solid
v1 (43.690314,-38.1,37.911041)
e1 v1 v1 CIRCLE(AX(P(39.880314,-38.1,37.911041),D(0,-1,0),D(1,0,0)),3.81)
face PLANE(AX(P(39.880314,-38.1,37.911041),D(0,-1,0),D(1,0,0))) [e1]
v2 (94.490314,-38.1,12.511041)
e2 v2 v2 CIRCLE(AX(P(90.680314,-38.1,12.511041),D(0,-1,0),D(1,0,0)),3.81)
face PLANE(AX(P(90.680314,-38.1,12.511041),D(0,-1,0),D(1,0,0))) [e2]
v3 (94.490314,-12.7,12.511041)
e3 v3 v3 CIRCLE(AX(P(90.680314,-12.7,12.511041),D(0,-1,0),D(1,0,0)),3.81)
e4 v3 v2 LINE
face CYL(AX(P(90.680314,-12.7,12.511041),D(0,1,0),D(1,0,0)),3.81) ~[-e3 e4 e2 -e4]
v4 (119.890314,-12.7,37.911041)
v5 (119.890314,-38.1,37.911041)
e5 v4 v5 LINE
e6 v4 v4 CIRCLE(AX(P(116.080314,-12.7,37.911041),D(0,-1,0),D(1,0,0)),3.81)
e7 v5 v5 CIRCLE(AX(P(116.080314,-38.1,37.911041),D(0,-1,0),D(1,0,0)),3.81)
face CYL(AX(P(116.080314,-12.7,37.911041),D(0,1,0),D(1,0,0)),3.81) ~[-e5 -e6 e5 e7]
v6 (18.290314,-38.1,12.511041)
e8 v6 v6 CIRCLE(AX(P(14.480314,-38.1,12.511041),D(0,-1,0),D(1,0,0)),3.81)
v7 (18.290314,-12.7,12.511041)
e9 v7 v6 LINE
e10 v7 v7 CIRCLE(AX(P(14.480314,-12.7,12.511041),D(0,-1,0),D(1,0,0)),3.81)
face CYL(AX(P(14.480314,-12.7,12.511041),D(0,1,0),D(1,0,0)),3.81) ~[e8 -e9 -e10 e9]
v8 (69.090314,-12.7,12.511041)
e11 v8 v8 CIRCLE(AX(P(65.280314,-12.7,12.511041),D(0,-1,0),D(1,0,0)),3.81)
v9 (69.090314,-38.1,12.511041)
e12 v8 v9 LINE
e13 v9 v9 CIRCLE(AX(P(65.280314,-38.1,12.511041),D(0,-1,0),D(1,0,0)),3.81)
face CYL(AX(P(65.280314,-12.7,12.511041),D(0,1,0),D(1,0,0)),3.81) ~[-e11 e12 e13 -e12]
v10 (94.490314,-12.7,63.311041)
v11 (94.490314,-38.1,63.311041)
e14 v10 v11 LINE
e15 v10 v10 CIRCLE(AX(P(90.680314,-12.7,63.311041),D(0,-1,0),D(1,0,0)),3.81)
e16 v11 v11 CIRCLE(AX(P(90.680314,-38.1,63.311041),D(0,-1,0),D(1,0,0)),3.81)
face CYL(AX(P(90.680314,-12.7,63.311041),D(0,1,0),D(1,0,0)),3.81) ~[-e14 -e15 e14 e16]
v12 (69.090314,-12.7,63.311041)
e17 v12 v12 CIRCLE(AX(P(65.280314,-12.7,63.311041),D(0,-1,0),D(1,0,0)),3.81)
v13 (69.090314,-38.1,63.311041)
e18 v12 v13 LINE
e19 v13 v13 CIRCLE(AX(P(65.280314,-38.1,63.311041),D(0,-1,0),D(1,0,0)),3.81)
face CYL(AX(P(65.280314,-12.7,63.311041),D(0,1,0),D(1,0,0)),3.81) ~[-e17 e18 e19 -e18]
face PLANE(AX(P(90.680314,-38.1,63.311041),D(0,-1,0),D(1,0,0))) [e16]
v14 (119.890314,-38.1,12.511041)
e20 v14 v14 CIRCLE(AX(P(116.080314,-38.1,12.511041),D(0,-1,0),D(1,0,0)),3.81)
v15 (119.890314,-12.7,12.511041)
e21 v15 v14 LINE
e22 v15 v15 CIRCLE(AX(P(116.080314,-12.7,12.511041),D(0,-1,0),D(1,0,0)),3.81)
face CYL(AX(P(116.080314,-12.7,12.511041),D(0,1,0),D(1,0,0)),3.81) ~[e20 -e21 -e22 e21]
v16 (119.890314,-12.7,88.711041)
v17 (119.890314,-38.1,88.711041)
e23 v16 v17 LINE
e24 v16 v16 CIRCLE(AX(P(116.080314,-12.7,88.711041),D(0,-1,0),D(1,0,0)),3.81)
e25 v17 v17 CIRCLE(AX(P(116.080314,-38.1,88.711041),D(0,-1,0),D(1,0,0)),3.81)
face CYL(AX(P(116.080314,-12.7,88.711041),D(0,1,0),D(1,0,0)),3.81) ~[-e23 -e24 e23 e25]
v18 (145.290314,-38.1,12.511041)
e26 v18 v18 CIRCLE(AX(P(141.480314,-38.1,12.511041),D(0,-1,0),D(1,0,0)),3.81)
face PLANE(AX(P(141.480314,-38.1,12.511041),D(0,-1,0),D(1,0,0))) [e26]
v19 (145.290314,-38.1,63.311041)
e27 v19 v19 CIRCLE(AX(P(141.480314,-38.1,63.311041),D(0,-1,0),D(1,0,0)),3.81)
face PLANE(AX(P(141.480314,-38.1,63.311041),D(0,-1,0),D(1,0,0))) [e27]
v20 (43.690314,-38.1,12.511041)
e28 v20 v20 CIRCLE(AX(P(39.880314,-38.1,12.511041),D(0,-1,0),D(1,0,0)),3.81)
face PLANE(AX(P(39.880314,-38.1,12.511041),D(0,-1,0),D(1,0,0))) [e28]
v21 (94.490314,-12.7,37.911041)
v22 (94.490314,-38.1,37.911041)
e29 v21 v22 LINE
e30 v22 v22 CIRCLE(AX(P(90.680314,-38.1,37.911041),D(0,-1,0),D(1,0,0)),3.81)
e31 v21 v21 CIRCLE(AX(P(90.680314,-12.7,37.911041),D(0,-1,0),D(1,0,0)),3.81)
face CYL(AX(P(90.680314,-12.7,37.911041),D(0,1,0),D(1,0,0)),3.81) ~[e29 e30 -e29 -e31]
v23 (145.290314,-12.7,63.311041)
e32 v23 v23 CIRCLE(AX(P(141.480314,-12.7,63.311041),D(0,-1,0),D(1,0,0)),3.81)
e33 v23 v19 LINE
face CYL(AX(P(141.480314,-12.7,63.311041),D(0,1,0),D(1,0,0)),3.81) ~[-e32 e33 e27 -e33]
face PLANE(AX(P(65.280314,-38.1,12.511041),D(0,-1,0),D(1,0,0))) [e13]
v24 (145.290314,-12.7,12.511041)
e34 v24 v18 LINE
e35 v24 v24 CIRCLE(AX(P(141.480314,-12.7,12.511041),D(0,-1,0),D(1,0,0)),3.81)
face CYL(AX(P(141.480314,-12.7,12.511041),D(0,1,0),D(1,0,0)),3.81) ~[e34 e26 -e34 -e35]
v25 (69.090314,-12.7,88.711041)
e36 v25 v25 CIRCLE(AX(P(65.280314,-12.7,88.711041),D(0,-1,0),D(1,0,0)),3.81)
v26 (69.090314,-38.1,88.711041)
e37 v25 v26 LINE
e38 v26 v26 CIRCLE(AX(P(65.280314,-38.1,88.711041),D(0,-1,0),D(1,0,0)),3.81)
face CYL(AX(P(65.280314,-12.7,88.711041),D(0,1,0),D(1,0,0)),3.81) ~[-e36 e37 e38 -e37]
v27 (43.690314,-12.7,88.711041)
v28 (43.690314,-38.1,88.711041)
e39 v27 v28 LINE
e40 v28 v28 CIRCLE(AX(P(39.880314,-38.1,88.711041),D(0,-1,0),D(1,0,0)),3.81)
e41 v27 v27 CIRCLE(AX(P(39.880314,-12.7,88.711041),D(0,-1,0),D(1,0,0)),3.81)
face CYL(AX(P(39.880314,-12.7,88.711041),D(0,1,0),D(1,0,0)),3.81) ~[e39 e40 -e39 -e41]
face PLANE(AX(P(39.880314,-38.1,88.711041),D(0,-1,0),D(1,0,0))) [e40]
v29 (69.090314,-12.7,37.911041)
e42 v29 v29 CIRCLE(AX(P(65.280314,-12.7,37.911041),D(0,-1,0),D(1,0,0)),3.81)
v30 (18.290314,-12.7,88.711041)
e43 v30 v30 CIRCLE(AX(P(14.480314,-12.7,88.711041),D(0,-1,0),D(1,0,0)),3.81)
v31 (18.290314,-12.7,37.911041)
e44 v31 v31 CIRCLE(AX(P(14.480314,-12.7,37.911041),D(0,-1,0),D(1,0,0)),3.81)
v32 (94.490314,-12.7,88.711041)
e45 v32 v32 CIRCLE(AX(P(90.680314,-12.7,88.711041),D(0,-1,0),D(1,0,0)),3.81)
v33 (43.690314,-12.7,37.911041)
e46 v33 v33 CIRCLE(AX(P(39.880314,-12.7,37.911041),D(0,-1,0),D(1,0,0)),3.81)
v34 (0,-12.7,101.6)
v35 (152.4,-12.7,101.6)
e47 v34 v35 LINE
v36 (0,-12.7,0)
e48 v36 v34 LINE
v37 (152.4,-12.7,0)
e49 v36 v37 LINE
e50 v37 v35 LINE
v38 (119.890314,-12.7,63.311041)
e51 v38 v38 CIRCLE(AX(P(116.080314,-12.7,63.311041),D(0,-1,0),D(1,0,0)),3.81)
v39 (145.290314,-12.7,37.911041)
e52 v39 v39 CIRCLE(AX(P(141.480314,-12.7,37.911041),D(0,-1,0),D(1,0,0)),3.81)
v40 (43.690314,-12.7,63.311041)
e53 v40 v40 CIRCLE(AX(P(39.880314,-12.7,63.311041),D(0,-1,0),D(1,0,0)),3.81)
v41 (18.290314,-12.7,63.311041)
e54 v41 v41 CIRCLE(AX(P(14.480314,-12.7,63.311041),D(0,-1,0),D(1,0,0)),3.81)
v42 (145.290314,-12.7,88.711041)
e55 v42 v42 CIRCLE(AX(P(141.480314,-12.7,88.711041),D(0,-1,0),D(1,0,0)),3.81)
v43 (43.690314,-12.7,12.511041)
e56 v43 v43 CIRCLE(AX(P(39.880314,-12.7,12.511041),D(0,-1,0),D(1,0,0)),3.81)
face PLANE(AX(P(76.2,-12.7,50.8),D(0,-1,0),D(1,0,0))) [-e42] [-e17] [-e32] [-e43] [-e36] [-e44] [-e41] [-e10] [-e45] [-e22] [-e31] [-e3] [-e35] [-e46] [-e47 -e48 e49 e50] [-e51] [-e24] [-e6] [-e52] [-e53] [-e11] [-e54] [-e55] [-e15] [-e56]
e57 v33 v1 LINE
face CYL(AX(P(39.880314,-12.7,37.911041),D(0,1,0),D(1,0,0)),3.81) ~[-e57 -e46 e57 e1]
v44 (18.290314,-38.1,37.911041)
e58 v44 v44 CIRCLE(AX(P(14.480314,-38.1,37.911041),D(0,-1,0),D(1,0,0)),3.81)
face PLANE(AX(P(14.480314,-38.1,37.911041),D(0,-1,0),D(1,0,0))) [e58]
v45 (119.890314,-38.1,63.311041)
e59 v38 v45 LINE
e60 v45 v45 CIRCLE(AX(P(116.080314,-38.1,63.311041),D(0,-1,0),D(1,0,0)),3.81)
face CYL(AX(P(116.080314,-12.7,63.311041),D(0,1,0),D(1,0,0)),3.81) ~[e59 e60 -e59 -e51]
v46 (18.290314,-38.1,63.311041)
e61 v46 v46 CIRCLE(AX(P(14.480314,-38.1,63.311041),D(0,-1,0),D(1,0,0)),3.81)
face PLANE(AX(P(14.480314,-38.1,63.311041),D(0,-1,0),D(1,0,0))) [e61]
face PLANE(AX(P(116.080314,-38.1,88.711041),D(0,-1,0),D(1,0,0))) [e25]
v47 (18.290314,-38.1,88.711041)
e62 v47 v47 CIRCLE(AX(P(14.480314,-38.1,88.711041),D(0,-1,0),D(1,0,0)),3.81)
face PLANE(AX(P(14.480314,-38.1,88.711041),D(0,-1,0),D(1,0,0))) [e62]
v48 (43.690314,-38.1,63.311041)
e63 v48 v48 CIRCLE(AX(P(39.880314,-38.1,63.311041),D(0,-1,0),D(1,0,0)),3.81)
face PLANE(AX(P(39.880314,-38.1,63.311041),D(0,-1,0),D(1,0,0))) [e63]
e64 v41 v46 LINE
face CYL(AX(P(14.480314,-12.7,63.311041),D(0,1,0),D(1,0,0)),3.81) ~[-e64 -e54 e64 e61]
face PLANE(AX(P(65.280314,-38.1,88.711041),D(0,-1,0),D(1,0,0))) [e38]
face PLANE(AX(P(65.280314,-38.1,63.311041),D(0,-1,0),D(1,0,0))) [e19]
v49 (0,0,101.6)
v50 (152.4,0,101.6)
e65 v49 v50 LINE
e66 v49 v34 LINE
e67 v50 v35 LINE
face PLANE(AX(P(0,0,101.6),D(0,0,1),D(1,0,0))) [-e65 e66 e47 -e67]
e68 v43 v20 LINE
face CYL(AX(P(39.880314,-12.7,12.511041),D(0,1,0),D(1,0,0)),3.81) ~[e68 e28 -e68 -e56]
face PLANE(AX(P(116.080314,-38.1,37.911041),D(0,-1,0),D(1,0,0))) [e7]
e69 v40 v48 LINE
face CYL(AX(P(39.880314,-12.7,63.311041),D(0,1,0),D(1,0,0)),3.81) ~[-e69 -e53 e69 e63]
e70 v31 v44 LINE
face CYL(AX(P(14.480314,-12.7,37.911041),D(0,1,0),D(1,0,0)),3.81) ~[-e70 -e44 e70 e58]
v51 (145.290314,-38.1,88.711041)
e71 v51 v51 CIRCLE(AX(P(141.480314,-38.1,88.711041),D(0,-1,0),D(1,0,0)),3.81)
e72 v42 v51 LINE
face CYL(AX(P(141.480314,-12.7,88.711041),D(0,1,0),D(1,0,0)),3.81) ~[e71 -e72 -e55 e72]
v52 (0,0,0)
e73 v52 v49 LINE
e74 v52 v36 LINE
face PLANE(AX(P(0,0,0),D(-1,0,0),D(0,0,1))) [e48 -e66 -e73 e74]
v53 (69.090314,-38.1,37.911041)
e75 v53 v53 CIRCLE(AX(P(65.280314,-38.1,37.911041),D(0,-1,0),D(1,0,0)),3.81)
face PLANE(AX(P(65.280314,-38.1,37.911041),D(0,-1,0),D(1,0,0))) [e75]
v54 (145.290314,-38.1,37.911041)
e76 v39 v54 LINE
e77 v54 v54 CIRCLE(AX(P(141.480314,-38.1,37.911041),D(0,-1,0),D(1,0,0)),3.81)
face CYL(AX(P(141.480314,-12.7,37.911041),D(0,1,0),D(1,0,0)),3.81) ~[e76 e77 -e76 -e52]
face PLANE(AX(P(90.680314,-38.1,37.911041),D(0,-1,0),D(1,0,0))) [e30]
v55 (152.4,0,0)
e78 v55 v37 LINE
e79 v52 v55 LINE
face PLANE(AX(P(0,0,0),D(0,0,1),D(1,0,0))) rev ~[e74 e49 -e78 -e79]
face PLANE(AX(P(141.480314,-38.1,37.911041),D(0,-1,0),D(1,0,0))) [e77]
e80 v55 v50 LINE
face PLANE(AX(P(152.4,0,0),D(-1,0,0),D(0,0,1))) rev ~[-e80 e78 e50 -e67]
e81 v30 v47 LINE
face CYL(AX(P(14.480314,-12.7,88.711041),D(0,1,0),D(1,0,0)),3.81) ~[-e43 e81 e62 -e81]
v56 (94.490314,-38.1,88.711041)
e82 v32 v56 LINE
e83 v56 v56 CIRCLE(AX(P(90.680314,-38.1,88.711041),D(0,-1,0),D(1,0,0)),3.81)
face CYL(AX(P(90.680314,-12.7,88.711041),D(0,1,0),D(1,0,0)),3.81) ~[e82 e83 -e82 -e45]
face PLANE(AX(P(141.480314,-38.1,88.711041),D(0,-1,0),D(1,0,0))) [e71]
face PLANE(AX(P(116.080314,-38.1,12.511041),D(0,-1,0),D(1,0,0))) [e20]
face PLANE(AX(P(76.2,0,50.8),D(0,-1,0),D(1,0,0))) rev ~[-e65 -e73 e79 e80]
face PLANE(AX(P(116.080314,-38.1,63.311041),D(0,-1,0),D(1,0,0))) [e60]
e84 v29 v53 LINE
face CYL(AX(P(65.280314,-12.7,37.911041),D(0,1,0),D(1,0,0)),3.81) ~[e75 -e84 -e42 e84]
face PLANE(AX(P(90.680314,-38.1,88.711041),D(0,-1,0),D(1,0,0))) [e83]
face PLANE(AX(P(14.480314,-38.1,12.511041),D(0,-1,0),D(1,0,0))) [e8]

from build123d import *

# Parameters (mm, degrees)
F0_W     = 152.4
F0_H     = 101.6
F1_DEPTH = 12.7
F2_R     = 3.81
F3_DEPTH = 25.4


# Not quite as in the source:
# - a feature names something its author has since deleted; it is built from what else it names


with BuildPart() as f1:
    # F0 (on Front) → F1 (new body)
    with BuildSketch(Plane.XZ):
        with Locations((76.2, 50.8)):
            Rectangle(F0_W, F0_H)
    extrude(amount=F1_DEPTH)

    # F2 (on face) → F3 (join)
    with BuildSketch(Plane.XZ.offset(12.7)):
        with Locations((14.4803142175, 12.5110410154)):
            Circle(F2_R)
        with Locations((14.4803142175, 37.9110410154)):
            Circle(F2_R)
        with Locations((14.4803142175, 63.3110410154)):
            Circle(F2_R)
        with Locations((14.4803142175, 88.7110410154)):
            Circle(F2_R)
        with Locations((39.8803142175, 12.5110410154)):
            Circle(F2_R)
        with Locations((39.8803142175, 37.9110410154)):
            Circle(F2_R)
        with Locations((39.8803142175, 63.3110410154)):
            Circle(F2_R)
        with Locations((39.8803142175, 88.7110410154)):
            Circle(F2_R)
        with Locations((65.2803142175, 12.5110410154)):
            Circle(F2_R)
        with Locations((65.2803142175, 37.9110410154)):
            Circle(F2_R)
        with Locations((65.2803142175, 63.3110410154)):
            Circle(F2_R)
        with Locations((65.2803142175, 88.7110410154)):
            Circle(F2_R)
        with Locations((90.6803142175, 12.5110410154)):
            Circle(F2_R)
        with Locations((90.6803142175, 37.9110410154)):
            Circle(F2_R)
        with Locations((90.6803142175, 63.3110410154)):
            Circle(F2_R)
        with Locations((90.6803142175, 88.7110410154)):
            Circle(F2_R)
        with Locations((116.0803142175, 12.5110410154)):
            Circle(F2_R)
        with Locations((116.0803142175, 37.9110410154)):
            Circle(F2_R)
        with Locations((116.0803142175, 63.3110410154)):
            Circle(F2_R)
        with Locations((116.0803142175, 88.7110410154)):
            Circle(F2_R)
        with Locations((141.4803142175, 12.5110410154)):
            Circle(F2_R)
        with Locations((141.4803142175, 37.9110410154)):
            Circle(F2_R)
        with Locations((141.4803142175, 63.3110410154)):
            Circle(F2_R)
        with Locations((141.4803142175, 88.7110410154)):
            Circle(F2_R)
    extrude(amount=F3_DEPTH)


solid = f1.part
